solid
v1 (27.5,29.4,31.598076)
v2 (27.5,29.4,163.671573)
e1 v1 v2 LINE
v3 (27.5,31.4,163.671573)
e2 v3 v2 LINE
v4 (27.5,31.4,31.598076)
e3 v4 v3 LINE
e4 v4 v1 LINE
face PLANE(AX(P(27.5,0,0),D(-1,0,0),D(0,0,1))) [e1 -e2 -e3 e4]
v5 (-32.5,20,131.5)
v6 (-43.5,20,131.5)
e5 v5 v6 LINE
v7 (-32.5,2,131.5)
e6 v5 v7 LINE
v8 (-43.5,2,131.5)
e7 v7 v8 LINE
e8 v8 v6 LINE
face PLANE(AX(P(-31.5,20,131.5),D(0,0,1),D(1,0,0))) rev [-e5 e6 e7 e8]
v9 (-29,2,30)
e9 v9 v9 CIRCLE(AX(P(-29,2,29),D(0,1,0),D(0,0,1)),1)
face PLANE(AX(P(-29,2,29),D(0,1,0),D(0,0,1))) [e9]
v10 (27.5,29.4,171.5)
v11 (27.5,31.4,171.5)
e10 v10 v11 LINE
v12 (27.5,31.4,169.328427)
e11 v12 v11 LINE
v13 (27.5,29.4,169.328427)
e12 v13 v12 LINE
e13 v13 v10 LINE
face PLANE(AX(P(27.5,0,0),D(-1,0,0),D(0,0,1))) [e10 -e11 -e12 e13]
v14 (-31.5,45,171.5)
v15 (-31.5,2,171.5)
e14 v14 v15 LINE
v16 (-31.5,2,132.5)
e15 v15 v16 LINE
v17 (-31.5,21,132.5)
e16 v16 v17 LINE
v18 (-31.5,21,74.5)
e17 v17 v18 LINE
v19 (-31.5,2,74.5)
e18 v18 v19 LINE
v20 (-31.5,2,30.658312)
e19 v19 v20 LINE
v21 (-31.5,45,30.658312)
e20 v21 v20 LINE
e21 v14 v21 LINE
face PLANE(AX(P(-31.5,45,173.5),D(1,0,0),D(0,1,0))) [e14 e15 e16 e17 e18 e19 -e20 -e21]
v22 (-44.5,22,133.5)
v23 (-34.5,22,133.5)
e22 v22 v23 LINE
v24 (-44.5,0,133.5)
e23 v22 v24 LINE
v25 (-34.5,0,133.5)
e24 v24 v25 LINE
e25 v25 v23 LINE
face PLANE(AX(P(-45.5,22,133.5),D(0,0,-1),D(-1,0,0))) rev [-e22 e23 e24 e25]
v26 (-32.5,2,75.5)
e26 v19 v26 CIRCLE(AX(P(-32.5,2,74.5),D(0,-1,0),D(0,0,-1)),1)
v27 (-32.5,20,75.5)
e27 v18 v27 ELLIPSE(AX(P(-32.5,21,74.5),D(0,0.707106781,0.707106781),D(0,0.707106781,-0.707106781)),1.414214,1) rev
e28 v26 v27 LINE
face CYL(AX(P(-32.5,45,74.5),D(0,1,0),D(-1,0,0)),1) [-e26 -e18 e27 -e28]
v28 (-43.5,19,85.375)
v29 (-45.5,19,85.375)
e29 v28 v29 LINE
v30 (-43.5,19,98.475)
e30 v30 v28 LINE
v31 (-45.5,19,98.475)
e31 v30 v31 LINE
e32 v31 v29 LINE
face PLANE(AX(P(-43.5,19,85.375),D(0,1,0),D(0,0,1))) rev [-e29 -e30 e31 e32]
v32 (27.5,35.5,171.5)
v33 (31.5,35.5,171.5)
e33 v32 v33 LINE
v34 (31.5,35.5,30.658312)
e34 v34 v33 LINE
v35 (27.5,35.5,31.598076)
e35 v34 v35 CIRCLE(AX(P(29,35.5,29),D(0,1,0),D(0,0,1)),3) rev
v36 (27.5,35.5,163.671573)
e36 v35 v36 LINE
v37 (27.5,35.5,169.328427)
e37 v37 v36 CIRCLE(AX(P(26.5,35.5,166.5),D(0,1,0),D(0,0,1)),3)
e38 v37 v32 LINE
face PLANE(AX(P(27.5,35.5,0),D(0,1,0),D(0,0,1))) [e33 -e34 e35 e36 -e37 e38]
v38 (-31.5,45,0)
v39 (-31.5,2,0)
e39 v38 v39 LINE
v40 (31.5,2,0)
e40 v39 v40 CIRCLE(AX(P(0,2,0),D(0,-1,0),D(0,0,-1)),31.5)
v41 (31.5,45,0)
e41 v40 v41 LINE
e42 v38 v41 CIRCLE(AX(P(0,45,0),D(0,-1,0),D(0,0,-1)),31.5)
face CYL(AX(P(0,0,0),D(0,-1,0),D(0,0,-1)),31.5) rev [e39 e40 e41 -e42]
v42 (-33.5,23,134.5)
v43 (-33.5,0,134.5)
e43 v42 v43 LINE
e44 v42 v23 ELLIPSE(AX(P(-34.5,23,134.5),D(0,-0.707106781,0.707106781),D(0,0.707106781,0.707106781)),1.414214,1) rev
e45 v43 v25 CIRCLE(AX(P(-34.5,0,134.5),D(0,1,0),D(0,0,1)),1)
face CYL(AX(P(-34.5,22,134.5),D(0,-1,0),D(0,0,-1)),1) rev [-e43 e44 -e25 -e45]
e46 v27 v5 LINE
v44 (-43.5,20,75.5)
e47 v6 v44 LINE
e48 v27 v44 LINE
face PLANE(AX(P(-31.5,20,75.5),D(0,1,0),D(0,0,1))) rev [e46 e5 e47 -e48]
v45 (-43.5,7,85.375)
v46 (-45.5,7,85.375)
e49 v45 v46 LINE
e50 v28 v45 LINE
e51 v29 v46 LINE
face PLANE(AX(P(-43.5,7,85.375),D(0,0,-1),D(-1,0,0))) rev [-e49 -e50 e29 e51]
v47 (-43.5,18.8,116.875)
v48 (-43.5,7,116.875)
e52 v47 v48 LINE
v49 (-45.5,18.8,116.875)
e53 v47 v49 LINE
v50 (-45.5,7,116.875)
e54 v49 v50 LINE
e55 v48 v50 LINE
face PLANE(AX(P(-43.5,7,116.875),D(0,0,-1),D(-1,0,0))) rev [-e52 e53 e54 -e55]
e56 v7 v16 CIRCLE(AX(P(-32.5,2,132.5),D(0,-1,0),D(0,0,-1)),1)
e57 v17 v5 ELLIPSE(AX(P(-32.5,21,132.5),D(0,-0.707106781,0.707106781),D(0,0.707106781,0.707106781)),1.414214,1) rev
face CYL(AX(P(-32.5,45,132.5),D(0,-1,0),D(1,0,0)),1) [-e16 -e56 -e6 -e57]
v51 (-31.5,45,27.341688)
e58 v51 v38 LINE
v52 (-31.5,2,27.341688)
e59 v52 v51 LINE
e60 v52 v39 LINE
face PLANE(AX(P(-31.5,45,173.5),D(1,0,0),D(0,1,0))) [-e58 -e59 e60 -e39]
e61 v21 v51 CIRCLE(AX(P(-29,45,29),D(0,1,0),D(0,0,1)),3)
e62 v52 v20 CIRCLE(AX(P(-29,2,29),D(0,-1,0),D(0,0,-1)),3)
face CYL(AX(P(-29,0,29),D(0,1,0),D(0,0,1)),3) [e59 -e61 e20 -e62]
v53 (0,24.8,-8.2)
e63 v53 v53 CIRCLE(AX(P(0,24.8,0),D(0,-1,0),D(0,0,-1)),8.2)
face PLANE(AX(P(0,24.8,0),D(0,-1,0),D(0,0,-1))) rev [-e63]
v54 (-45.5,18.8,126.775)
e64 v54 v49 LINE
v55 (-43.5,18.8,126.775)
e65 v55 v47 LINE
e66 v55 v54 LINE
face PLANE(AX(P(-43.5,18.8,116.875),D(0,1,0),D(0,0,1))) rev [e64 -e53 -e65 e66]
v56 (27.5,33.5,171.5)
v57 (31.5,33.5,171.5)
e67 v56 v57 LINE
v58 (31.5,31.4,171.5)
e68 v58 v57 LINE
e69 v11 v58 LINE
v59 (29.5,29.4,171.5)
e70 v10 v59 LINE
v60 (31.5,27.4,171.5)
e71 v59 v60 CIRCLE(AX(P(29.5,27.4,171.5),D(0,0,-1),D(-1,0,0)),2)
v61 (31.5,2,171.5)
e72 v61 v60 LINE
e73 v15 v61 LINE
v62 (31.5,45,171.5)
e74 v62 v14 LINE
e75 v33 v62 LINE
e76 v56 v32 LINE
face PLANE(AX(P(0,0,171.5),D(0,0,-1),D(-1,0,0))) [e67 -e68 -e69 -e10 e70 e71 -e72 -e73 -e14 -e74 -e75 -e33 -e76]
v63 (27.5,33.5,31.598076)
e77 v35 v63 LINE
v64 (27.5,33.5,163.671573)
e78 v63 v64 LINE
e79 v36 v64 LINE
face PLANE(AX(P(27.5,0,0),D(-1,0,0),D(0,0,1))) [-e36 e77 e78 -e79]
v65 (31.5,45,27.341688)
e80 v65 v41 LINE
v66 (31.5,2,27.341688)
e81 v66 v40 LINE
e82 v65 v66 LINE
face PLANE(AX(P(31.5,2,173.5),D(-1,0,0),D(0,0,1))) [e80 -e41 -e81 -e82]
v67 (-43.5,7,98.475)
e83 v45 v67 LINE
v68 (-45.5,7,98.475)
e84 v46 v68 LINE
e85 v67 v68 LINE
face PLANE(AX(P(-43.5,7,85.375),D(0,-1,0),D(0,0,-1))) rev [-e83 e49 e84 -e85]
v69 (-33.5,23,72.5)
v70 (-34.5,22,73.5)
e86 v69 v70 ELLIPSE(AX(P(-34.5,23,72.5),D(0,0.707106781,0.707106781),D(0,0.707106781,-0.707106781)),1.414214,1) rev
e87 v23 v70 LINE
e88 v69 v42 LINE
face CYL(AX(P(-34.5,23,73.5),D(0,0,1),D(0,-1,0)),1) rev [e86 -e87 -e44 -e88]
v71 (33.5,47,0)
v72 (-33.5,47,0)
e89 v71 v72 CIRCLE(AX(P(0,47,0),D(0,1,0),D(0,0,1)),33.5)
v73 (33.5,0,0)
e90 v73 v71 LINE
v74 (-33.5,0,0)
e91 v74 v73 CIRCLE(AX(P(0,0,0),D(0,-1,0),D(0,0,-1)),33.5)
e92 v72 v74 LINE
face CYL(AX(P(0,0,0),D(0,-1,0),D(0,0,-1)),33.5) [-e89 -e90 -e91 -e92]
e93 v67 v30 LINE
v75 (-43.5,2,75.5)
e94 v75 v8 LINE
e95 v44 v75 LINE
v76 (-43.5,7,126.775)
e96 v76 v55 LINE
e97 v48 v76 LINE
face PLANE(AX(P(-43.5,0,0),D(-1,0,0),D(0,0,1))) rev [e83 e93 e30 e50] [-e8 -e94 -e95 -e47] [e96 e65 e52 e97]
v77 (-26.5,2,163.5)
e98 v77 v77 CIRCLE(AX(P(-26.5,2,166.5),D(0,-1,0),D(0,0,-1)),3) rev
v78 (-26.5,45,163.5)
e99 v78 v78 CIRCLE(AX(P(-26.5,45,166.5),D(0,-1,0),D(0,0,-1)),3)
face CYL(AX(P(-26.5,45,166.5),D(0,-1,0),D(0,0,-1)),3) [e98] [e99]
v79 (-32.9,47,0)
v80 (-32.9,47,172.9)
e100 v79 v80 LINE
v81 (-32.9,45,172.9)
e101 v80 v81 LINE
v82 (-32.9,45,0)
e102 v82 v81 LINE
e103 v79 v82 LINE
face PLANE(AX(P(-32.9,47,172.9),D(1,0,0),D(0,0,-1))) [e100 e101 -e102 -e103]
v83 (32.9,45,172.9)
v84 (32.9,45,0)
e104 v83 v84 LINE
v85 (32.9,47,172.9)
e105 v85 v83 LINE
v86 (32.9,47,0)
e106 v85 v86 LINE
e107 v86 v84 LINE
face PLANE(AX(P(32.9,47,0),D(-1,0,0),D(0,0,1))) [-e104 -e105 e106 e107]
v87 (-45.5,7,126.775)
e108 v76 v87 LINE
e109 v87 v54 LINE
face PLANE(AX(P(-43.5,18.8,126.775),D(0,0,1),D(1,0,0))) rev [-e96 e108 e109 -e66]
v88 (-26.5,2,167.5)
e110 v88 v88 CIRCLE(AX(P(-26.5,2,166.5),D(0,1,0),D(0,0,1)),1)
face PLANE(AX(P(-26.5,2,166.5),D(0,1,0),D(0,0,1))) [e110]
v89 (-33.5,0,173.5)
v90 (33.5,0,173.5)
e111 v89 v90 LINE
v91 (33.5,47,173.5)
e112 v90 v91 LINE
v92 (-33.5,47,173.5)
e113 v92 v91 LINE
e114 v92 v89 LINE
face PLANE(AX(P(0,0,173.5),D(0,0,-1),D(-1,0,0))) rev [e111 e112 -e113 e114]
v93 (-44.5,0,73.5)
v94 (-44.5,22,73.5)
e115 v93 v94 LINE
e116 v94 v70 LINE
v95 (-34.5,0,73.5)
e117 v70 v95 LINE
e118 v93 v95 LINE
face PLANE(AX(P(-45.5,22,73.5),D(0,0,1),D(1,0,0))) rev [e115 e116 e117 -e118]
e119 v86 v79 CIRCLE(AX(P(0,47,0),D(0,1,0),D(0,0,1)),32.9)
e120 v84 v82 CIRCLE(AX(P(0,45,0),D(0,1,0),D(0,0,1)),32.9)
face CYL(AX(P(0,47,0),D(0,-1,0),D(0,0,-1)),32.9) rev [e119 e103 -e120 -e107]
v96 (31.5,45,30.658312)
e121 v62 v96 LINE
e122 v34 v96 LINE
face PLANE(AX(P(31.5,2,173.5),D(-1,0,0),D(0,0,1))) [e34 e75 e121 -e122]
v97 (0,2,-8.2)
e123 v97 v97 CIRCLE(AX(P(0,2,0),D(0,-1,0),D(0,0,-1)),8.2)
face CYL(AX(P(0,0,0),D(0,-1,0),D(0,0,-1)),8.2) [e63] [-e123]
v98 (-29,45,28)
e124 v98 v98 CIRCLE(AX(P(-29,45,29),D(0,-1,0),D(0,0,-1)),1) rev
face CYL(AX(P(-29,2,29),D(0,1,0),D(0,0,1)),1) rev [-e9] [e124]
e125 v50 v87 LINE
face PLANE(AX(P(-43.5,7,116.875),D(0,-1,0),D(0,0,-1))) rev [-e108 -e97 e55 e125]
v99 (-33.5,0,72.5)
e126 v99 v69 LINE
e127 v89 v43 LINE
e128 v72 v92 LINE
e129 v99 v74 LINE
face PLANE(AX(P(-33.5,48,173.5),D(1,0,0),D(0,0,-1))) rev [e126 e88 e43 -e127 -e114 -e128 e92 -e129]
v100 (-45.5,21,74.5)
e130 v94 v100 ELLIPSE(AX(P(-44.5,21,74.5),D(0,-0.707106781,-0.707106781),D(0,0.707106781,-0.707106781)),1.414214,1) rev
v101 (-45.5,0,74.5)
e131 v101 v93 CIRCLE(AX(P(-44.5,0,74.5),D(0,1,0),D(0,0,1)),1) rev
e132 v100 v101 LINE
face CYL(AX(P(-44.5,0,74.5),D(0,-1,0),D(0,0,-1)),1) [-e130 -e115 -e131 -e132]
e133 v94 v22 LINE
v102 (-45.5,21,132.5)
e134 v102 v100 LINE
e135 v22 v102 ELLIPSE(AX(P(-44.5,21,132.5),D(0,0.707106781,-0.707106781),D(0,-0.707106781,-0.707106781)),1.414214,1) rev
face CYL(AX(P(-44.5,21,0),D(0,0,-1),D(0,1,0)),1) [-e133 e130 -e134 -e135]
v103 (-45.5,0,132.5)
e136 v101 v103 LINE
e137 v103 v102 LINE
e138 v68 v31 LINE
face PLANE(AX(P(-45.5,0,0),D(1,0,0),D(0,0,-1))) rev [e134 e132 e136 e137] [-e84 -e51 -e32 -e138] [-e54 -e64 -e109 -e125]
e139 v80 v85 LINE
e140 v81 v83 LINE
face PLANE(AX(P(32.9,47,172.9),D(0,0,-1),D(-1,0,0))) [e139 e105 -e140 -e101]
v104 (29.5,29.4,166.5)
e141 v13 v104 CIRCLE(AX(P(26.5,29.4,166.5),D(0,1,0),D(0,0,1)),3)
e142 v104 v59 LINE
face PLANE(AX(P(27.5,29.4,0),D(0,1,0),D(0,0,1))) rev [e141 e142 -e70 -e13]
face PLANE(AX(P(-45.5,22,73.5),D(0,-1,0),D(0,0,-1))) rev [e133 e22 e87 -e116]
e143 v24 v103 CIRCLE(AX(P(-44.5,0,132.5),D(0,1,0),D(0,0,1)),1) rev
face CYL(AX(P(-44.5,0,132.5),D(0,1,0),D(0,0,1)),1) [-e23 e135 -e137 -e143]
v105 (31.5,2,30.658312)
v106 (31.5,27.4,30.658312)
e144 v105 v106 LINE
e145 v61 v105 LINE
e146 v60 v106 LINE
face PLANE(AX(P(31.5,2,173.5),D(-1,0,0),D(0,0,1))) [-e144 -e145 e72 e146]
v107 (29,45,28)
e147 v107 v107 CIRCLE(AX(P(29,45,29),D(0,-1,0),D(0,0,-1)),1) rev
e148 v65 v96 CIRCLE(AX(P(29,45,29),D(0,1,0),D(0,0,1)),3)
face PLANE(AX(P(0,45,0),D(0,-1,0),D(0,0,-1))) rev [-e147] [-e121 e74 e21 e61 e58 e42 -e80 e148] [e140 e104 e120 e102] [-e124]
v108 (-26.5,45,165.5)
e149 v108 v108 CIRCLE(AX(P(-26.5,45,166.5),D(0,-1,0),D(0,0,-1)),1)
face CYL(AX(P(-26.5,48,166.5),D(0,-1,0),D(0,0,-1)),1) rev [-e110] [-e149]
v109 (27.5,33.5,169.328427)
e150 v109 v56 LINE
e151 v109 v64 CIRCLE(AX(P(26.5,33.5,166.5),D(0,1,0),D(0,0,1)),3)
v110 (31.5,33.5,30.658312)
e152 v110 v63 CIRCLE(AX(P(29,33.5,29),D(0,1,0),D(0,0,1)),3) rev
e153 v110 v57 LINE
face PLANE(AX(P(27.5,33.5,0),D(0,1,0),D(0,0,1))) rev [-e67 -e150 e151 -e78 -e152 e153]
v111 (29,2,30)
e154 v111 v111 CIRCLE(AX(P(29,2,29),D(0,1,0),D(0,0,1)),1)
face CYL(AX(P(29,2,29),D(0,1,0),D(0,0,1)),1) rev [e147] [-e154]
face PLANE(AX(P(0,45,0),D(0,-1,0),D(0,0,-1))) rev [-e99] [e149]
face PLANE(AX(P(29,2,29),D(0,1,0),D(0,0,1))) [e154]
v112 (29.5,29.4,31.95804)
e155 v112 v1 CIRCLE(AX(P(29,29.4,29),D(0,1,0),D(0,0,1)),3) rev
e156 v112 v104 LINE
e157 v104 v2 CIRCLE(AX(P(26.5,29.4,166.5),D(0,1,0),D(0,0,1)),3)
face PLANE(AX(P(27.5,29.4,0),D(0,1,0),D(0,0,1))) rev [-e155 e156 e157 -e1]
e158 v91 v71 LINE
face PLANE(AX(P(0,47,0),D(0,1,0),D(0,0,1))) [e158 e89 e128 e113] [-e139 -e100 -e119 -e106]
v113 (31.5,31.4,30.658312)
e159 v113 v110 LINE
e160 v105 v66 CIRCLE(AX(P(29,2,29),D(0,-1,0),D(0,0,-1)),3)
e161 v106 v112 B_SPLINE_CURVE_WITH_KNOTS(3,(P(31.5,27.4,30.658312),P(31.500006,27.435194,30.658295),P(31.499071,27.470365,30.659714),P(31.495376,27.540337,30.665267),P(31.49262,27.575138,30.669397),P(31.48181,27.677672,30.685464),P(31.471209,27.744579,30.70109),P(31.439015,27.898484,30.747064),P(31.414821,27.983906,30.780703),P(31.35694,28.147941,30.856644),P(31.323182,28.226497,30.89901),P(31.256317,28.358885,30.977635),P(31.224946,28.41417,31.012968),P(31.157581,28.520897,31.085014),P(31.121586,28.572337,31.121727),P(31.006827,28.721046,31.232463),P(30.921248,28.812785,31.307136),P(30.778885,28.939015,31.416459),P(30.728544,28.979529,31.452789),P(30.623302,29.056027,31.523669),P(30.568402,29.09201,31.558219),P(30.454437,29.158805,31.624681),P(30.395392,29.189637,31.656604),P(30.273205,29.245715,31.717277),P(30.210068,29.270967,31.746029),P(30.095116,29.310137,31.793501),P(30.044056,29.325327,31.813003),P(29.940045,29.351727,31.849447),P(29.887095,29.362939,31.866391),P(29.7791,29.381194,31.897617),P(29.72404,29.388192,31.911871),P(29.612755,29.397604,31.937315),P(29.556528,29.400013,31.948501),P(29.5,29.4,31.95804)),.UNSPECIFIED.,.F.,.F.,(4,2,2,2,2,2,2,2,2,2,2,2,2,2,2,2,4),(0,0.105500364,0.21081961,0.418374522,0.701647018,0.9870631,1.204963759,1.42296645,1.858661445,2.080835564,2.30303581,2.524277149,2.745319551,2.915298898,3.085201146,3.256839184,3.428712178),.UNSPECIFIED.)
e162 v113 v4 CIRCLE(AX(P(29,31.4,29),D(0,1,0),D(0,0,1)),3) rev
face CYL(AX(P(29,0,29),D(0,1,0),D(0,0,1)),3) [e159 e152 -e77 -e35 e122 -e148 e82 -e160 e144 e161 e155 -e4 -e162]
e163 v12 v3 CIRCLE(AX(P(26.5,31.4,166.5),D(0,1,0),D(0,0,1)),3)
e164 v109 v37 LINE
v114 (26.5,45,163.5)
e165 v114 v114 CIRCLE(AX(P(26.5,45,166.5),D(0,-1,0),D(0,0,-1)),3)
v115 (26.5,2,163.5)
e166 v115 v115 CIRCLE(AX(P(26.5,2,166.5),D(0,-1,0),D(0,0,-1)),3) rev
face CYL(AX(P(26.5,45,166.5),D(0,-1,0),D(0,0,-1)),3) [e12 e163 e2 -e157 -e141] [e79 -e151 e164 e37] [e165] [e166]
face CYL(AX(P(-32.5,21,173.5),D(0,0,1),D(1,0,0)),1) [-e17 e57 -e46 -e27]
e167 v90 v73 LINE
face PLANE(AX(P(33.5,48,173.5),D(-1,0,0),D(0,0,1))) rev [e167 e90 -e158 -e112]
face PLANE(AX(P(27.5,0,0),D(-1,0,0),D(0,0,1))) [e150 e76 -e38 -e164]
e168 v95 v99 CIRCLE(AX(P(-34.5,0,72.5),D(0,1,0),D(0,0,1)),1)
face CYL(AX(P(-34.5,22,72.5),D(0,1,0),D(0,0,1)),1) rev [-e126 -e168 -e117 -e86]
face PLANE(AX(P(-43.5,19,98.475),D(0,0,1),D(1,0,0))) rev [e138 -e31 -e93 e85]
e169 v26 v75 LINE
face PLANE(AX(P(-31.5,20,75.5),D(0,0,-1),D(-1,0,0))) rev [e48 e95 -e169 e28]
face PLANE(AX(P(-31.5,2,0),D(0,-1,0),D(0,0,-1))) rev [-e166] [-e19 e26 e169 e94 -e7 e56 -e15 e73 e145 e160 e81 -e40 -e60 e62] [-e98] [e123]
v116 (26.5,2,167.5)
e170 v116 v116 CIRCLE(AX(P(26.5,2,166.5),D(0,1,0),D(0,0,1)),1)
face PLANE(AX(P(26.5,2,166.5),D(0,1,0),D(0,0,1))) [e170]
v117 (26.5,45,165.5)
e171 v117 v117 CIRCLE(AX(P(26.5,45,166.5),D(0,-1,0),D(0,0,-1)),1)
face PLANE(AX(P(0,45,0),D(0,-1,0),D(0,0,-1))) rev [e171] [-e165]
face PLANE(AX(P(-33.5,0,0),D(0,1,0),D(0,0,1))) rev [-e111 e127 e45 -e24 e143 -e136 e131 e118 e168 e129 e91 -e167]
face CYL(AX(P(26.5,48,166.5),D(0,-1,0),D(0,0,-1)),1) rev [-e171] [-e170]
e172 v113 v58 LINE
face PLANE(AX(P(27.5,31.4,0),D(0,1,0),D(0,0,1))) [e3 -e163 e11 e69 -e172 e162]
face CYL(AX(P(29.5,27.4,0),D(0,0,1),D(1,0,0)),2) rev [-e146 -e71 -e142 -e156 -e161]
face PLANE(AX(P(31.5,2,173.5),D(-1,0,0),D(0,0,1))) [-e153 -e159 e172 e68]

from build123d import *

# Parameters (mm, degrees)
SKETCH4_W                = 63
SKETCH4_H                = 43
BOSS_EXTRUDE2_DEPTH      = 173.5
SKETCH6_R                = 4
CUT_EXTRUDE1_DEPTH       = 3
SKETCH9_W                = 63
SKETCH9_H                = 43
CUT_EXTRUDE2_DEPTH       = 173.5
SKETCH10_R               = 8.2
BOSS_EXTRUDE3_DEPTH      = 22.8
SKETCH11_W               = 63
SKETCH11_H               = 43
BOSS_EXTRUDE4_DEPTH      = 2
SKETCH13_R               = 3
BOSS_EXTRUDE5_DEPTH      = 43
SKETCH14_R               = 1
CUT_EXTRUDE3_DEPTH       = 46
SKETCH15_R               = 4.3
CUT_EXTRUDE4_DEPTH       = 2
FILLET1_R                = 1
SKETCH19_R               = 6
CUT_EXTRUDE5_DEPTH       = 3
BOSS_EXTRUDE6_DEPTH      = 94
SKETCH21_W               = 37.035898385
SKETCH21_H               = 94
CUT_EXTRUDE6_DEPTH       = 13
FILLET2_R                = 1
BOSS_EXTRUDE8_DEPTH      = 2
SKETCH23_W               = 72.5
SKETCH23_H               = 25.3
CUT_EXTRUDE7_DEPTH       = 2
BOSS_EXTRUDE9_START      = -2
BOSS_EXTRUDE9_DEPTH      = 2
SKETCH25_R               = 3
BOSS_EXTRUDE10_DEPTH     = 48
SKETCH26_R               = 1
CUT_EXTRUDE8_DEPTH       = 46
SKETCH27_R               = 4.3
CUT_EXTRUDE9_DEPTH       = 2
FILLET3_R                = 1
SKETCH30_W               = 56
SKETCH30_H               = 18
CUT_EXTRUDE10_DEPTH      = 2
SKETCH31_W               = 60
SKETCH31_H               = 22
SKETCH31_W_2             = 56
SKETCH31_H_2             = 18
BOSS_EXTRUDE11_DEPTH     = 12
FILLET4_R                = 1
SKETCH33_W               = 56
SKETCH33_H               = 18
BOSS_EXTRUDE12_DEPTH     = 2
SKETCH34_W               = 1.256410256
SKETCH34_H               = 14
CUT_EXTRUDE11_DEPTH      = 1
SKETCH35_W               = 13.1
SKETCH35_H               = 12
SKETCH35_W_2             = 9.9
SKETCH35_H_2             = 11.8
CUT_EXTRUDE12_DEPTH      = 2
FILLET5_R                = 1
CUT_EXTRUDE13_DEPTH      = 186.67848556
CUT_EXTRUDE13_DEPTH_BACK = 3
FILLET6_R                = 1
SKETCH37_W               = 140.841687605
SKETCH37_H               = 2
BOSS_EXTRUDE13_DEPTH     = 4
FILLET8_R                = 2
SKETCH38_W               = 101.517619225
SKETCH38_H               = 238.576301881
CUT_EXTRUDE14_DEPTH      = 100
BOSS_EXTRUDE14_DEPTH     = 2


with BuildPart() as part:
    # Sketch1 → Revolve1 (revolve)
    with BuildSketch(Plane.XY, mode=Mode.PRIVATE) as revolve1_sk:
        Polygon((-31.5, 48), (-31.5, 50), (-33.5, 50), (-33.5, 0), (0, 0), (0, 24.8), (-8.2, 24.8), (-8.2, 2), (-31.5, 2), (-31.5, 45), (-4, 45), (-4, 48), align=None)
    revolve(revolve1_sk.sketch.rotate(Axis((0, 0, 0), (0, 1, 0)), 270), axis=Axis((0, 0, 0), (0, 1, 0)))

    # Sketch4 → Boss-Extrude2 (add)
    with BuildSketch(Plane.XY):
        Polygon((33.5, 0), (-33.5, 0), (-33.5, 48), (-31.5, 48), (31.5, 48), (33.5, 48), align=None)
        with Locations((0, 23.5)):
            Rectangle(SKETCH4_W, SKETCH4_H, mode=Mode.SUBTRACT)
    extrude(amount=BOSS_EXTRUDE2_DEPTH)

    # Sketch6 → Cut-Extrude1 (cut)
    with BuildSketch(Plane(origin=(0, 48, 0), x_dir=(1, 0, 0), z_dir=(0, 1, 0))):
        with Locations(Location((0, 0, 0), (0, 0, 90))):
            Circle(SKETCH6_R)
    extrude(amount=-CUT_EXTRUDE1_DEPTH, mode=Mode.SUBTRACT)

    # Sketch9 → Cut-Extrude2 (cut)
    with BuildSketch(Plane.XY.offset(173.5)):
        with Locations((0, 23.5)):
            Rectangle(SKETCH9_W, SKETCH9_H)
    extrude(amount=-CUT_EXTRUDE2_DEPTH, mode=Mode.SUBTRACT)

    # Sketch10 → Boss-Extrude3 (add)
    with BuildSketch(Plane(origin=(0, 2, 0), x_dir=(1, 0, 0), z_dir=(0, 1, 0))):
        with Locations(Location((0, 0, 0), (0, 0, 90))):
            Circle(SKETCH10_R)
    extrude(amount=BOSS_EXTRUDE3_DEPTH)

    # Sketch11 → Boss-Extrude4 (add)
    with BuildSketch(Plane.XY.offset(173.5)):
        with Locations((0, 23.5)):
            Rectangle(SKETCH11_W, SKETCH11_H)
    extrude(amount=-BOSS_EXTRUDE4_DEPTH)

    # Sketch13 → Boss-Extrude5 (add)
    with BuildSketch(Plane(origin=(0, 2, 0), x_dir=(1, 0, 0), z_dir=(0, 1, 0))):
        with Locations(Location((-26.5, -166.5, 0), (0, 0, 90))):
            Circle(SKETCH13_R)
        with Locations(Location((26.5, -166.5, 0), (0, 0, 90))):
            Circle(SKETCH13_R)
    extrude(amount=BOSS_EXTRUDE5_DEPTH)

    # Sketch14 → Cut-Extrude3 (cut)
    with BuildSketch(Plane(origin=(0, 2, 0), x_dir=(1, 0, 0), z_dir=(0, 1, 0))):
        with Locations(Location((-26.5, -166.5, 0), (0, 0, 270))):
            Circle(SKETCH14_R)
        with Locations(Location((26.5, -166.5, 0), (0, 0, 270))):
            Circle(SKETCH14_R)
    extrude(amount=CUT_EXTRUDE3_DEPTH, mode=Mode.SUBTRACT)

    # Sketch15 → Cut-Extrude4 (cut)
    with BuildSketch(Plane(origin=(0, 48, 0), x_dir=(1, 0, 0), z_dir=(0, 1, 0))):
        with Locations(Location((-26.5, -166.5, 0), (0, 0, 270))):
            Circle(SKETCH15_R)
        with Locations(Location((26.5, -166.5, 0), (0, 0, 270))):
            Circle(SKETCH15_R)
    extrude(amount=-CUT_EXTRUDE4_DEPTH, mode=Mode.SUBTRACT)

    # Fillet1
    fillet1_edges = [part.edges().sort_by_distance(p)[0] for p in [
        (-26.5, 46, 162.2),
        (26.5, 46, 162.2),
    ]]
    fillet(fillet1_edges, radius=FILLET1_R)

    # Sketch19 → Cut-Extrude5 (cut)
    with BuildSketch(Plane(origin=(0, 48, 0), x_dir=(1, 0, 0), z_dir=(0, 1, 0))):
        with Locations(Location((16.75, -51, 0), (0, 0, 270))):
            Circle(SKETCH19_R)
        with Locations(Location((16.75, -86, 0), (0, 0, 270))):
            Circle(SKETCH19_R)
        with Locations(Location((16.75, -121, 0), (0, 0, 270))):
            Circle(SKETCH19_R)
        with Locations(Location((16.75, -156, 0), (0, 0, 270))):
            Circle(SKETCH19_R)
    extrude(amount=-CUT_EXTRUDE5_DEPTH, mode=Mode.SUBTRACT)

    # Sketch20 → Boss-Extrude6 (add)
    with BuildSketch(Plane.XY.offset(56.5)):
        Polygon((9, 48), (-11.207259422, 83), (-33.5, 83), (-33.5, 48), align=None)
        Polygon((5.535898385, 50), (-12.36195996, 81), (-31.5, 81), (-31.5, 50), align=None, mode=Mode.SUBTRACT)
    extrude(amount=BOSS_EXTRUDE6_DEPTH)

    # Sketch21 → Cut-Extrude6 (cut)
    with BuildSketch(Plane(origin=(0, 50, 0), x_dir=(1, 0, 0), z_dir=(0, 1, 0))):
        with Locations((-12.982050808, -103.5)):
            Rectangle(SKETCH21_W, SKETCH21_H)
    extrude(amount=-CUT_EXTRUDE6_DEPTH, mode=Mode.SUBTRACT)

    # Fillet2
    fillet2_edges = [part.edges().sort_by_distance(p)[0] for p in [
        (-11.207259422, 83, 103.5),
        (-33.5, 83, 103.5),
    ]]
    fillet(fillet2_edges, radius=FILLET2_R)

    # Sketch22 → Boss-Extrude8 (add)
    with BuildSketch(Plane.XY.offset(150.5)):
        with BuildLine():
            Line((-33.5, 48), (-33.5, 45))
            Line((-33.5, 45), (9, 45))
            Line((9, 45), (9, 48))
            Line((9, 48), (-10.918584287, 82.5))
            ThreePointArc((-10.918584287, 82.5), (-11.284609691, 82.866025404), (-11.784609691, 83))
            Line((-11.784609691, 83), (-32.5, 83))
            ThreePointArc((-32.5, 83), (-33.207106781, 82.707106781), (-33.5, 82))
            Line((-33.5, 82), (-33.5, 48))
        make_face()
    extrude(amount=-BOSS_EXTRUDE8_DEPTH)

    # Sketch23 → Cut-Extrude7 (cut)
    with BuildSketch(Plane(origin=(27.534609691, 15.897114317, 0), x_dir=(0, 0, -1), z_dir=(0.8660254037844364, 0.5000000000000041, 0))):
        with Locations((-103.5, 54.719219382)):
            Rectangle(SKETCH23_W, SKETCH23_H)
    extrude(amount=-CUT_EXTRUDE7_DEPTH, mode=Mode.SUBTRACT)

    # Sketch24 → Boss-Extrude9 (add)
    with BuildSketch(Plane(origin=(0, 0, 56.5), x_dir=(-1, 0, 0), z_dir=(0, 0, -1)).offset(BOSS_EXTRUDE9_START)):
        with BuildLine():
            Line((-9, 48), (-9, 45))
            Line((-9, 45), (33.5, 45))
            Line((33.5, 45), (33.5, 82))
            ThreePointArc((33.5, 82), (33.207106781, 82.707106781), (32.5, 83))
            Line((32.5, 83), (11.784609691, 83))
            ThreePointArc((11.784609691, 83), (11.284609691, 82.866025404), (10.918584287, 82.5))
            Line((10.918584287, 82.5), (-9, 48))
        make_face()
    extrude(amount=BOSS_EXTRUDE9_DEPTH)

    # Sketch25 → Boss-Extrude10 (add)
    with BuildSketch(Plane(origin=(0, 48, 0), x_dir=(1, 0, 0), z_dir=(0, 1, 0))):
        with Locations((29, -29)):
            Circle(SKETCH25_R)
        with Locations((-29, -29)):
            Circle(SKETCH25_R)
    extrude(amount=-BOSS_EXTRUDE10_DEPTH)

    # Sketch26 → Cut-Extrude8 (cut)
    with BuildSketch(Plane(origin=(0, 48, 0), x_dir=(1, 0, 0), z_dir=(0, 1, 0))):
        with Locations(Location((29, -29, 0), (0, 0, 270))):
            Circle(SKETCH26_R)
        with Locations(Location((-29, -29, 0), (0, 0, 270))):
            Circle(SKETCH26_R)
    extrude(amount=-CUT_EXTRUDE8_DEPTH, mode=Mode.SUBTRACT)

    # Sketch27 → Cut-Extrude9 (cut)
    with BuildSketch(Plane(origin=(0, 48, 0), x_dir=(1, 0, 0), z_dir=(0, 1, 0))):
        with Locations(Location((-29, -29, 0), (0, 0, 270))):
            Circle(SKETCH27_R)
        with Locations(Location((29, -29, 0), (0, 0, 270))):
            Circle(SKETCH27_R)
    extrude(amount=-CUT_EXTRUDE9_DEPTH, mode=Mode.SUBTRACT)

    # Fillet3
    fillet3_edges = [part.edges().sort_by_distance(p)[0] for p in [
        (-29, 46, 24.7),
        (29, 46, 24.7),
    ]]
    fillet(fillet3_edges, radius=FILLET3_R)

    # Sketch30 → Cut-Extrude10 (cut)
    with BuildSketch(Plane.ZY.offset(33.5)):
        with Locations((103.5, 11)):
            Rectangle(SKETCH30_W, SKETCH30_H)
    extrude(amount=-CUT_EXTRUDE10_DEPTH, mode=Mode.SUBTRACT)

    # Sketch31 → Boss-Extrude11 (add)
    with BuildSketch(Plane.ZY.offset(33.5)):
        with Locations((103.5, 11)):
            Rectangle(SKETCH31_W, SKETCH31_H)
        with Locations((103.5, 11)):
            Rectangle(SKETCH31_W_2, SKETCH31_H_2, mode=Mode.SUBTRACT)
    extrude(amount=BOSS_EXTRUDE11_DEPTH)

    # Fillet4
    fillet4_edges = [part.edges().sort_by_distance(p)[0] for p in [
        (-33.5, 22, 103.5),
        (-33.5, 11, 73.5),
        (-33.5, 11, 133.5),
    ]]
    fillet(fillet4_edges, radius=FILLET4_R)

    # Sketch33 → Boss-Extrude12 (add)
    with BuildSketch(Plane.ZY.offset(45.5)):
        with Locations((103.5, 11)):
            Rectangle(SKETCH33_W, SKETCH33_H)
    extrude(amount=-BOSS_EXTRUDE12_DEPTH)

    # Sketch34 → Cut-Extrude11 (cut)
    # profile 1 of 6: a face of its own
    with BuildSketch(Plane(origin=(-88.690997647, 83, 0), x_dir=(0, 0, -1), z_dir=(0, -1, 0))):
        with Locations((-131.948717949, 66.906387956)):
            Rectangle(SKETCH34_W, SKETCH34_H)
    # profile 2 of 6: a face of its own
    with BuildSketch(Plane(origin=(-88.690997647, 83, 0), x_dir=(0, 0, -1), z_dir=(0, -1, 0))):
        with BuildLine():
            add(Edge.make_bspline(
                [(-127.282051282, 71.752541802), (-127.204036474, 71.757021384), (-127.05199672, 71.765751451), (-126.831838559, 71.829913099), (-126.630653738, 71.938172272), (-126.452556555, 72.086921483), (-126.304534975, 72.264507803), (-126.195030127, 72.46518156), (-126.127927486, 72.68597799), (-126.119633012, 72.84021095), (-126.115384615, 72.919208469)],
                knots=[0, 0, 0, 0, 1.020591893, 1.988988293, 2.974634352, 3.991697318, 5.008760285, 5.983632262, 6.967224335, 8, 8, 8, 8], degree=3))
            add(Edge.make_bspline(
                [(-126.115384615, 72.919208469), (-126.119787901, 72.996319721), (-126.128486105, 73.148644483), (-126.195061577, 73.367578068), (-126.30439614, 73.56847965), (-126.453493838, 73.745645733), (-126.6295776, 73.897974931), (-126.832476342, 74.004732003), (-127.051429094, 74.073595456), (-127.203934167, 74.081715722), (-127.282051282, 74.085875135)],
                knots=[0, 0, 0, 0, 1.010056097, 1.99525427, 2.971718109, 3.990441831, 5.01702829, 6.004283803, 6.977741589, 8, 8, 8, 8], degree=3))
            add(Edge.make_bspline(
                [(-127.282051282, 74.085875135), (-127.360112179, 74.081559045), (-127.513404007, 74.073083337), (-127.73317612, 74.006101082), (-127.934845679, 73.896933206), (-128.11097521, 73.745920643), (-128.258874388, 73.567557044), (-128.373284839, 73.368945884), (-128.434548495, 73.148011315), (-128.443950276, 72.996195002), (-128.448717949, 72.919208469)],
                knots=[0, 0, 0, 0, 1.021821805, 2.006599202, 2.982645994, 4.008793999, 5.027082625, 6.009034913, 6.990375297, 8, 8, 8, 8], degree=3))
            add(Edge.make_bspline(
                [(-128.448717949, 72.919208469), (-128.444092294, 72.840340078), (-128.435076647, 72.686621378), (-128.373312706, 72.463815008), (-128.258735298, 72.265431373), (-128.111909392, 72.086648721), (-127.933780412, 71.939197607), (-127.733801774, 71.828562965), (-127.51284526, 71.76625627), (-127.360012131, 71.757174469), (-127.282051282, 71.752541802)],
                knots=[0, 0, 0, 0, 1.032329927, 2.012066096, 2.992413168, 4.009037178, 5.025661188, 6.000112418, 6.979848586, 8, 8, 8, 8], degree=3))
        make_face()
    # profile 3 of 6: a face of its own
    with BuildSketch(Plane(origin=(-88.690997647, 83, 0), x_dir=(0, 0, -1), z_dir=(0, -1, 0))):
        Polygon((-122.884615385, 59.906387956), (-121.628205128, 59.906387956), (-121.628205128, 65.649977699), (-114.448717949, 65.649977699), (-114.448717949, 59.906387956), (-113.192307692, 59.906387956), (-113.192307692, 73.906387956), (-114.448717949, 73.906387956), (-114.448717949, 67.085875135), (-121.628205128, 67.085875135), (-121.628205128, 73.906387956), (-122.884615385, 73.906387956), align=None)
    # profile 4 of 6: a face of its own
    with BuildSketch(Plane(origin=(-88.690997647, 83, 0), x_dir=(0, 0, -1), z_dir=(0, -1, 0))):
        with BuildLine():
            Line((-99.551282051, 63.675618725), (-99.551282051, 73.906387956))
            Line((-99.551282051, 73.906387956), (-100.807692308, 73.906387956))
            Line((-100.807692308, 73.906387956), (-100.807692308, 72.136756545))
            add(Edge.make_bspline(
                [(-100.807692308, 72.136756545), (-100.949559408, 72.296694095), (-101.226826553, 72.609278391), (-101.685478933, 73.020163), (-102.175666693, 73.355630058), (-102.689038567, 73.627929327), (-103.229568228, 73.833193668), (-103.794081172, 73.977799853), (-104.382135708, 74.071868231), (-104.783157032, 74.081164279), (-104.986378205, 74.085875135)],
                knots=[0, 0, 0, 0, 1.074235403, 2.099501444, 3.086304576, 4.053325556, 5.01427503, 5.985443889, 6.979105517, 8, 8, 8, 8], degree=3))
            add(Edge.make_bspline(
                [(-104.986378205, 74.085875135), (-105.167050511, 74.08097046), (-105.523344299, 74.071298224), (-106.047453548, 73.996237304), (-106.551848614, 73.875758039), (-107.036850958, 73.707995401), (-107.499174292, 73.486612277), (-107.941423686, 73.21870812), (-108.36463127, 72.902801794), (-108.760748522, 72.540247251), (-109.125978444, 72.14687795), (-109.445517738, 71.726092193), (-109.716337693, 71.283669461), (-109.938903193, 70.8197341), (-110.111136046, 70.334625248), (-110.23096351, 69.828675698), (-110.305943543, 69.302727324), (-110.315610879, 68.944567704), (-110.320512821, 68.762958469)],
                knots=[0, 0, 0, 0, 1.034036272, 2.039165313, 3.024406509, 3.999331371, 4.971254918, 5.953351348, 6.95522652, 7.989525907, 9.023492927, 10.024309745, 11.009187477, 11.988246066, 12.964946762, 13.950187958, 14.960617622, 16, 16, 16, 16], degree=3))
            add(Edge.make_bspline(
                [(-110.320512821, 68.762958469), (-110.315502156, 68.585102896), (-110.305596342, 68.233492024), (-110.23176582, 67.716388188), (-110.107706917, 67.2182747), (-109.933274241, 66.740996758), (-109.710590389, 66.282632207), (-109.435112943, 65.846767298), (-109.115688796, 65.426734526), (-108.74655549, 65.036003596), (-108.34688294, 64.676390503), (-107.921307552, 64.359716463), (-107.475135823, 64.092499188), (-107.007473118, 63.875277522), (-106.5216309, 63.702659962), (-106.013918487, 63.582328903), (-105.48664475, 63.511593502), (-105.128686543, 63.501335053), (-104.947115385, 63.496131545)],
                knots=[0, 0, 0, 0, 1.02050356, 2.017480486, 2.990790918, 3.96161403, 4.928589988, 5.909588639, 6.91611943, 7.952353252, 8.989586576, 9.99823133, 10.991940466, 11.968822692, 12.952985106, 13.945868367, 14.958059758, 16, 16, 16, 16], degree=3))
            add(Edge.make_bspline(
                [(-104.947115385, 63.496131545), (-104.738311782, 63.501860959), (-104.328857772, 63.513096067), (-103.729112136, 63.607392592), (-103.161484658, 63.765224909), (-102.621058799, 63.980649759), (-102.115429291, 64.270750367), (-101.639735311, 64.629702222), (-101.199621142, 65.066207485), (-100.9405952, 65.398270363), (-100.807692308, 65.568647571)],
                knots=[0, 0, 0, 0, 1.038908319, 2.037250181, 3.012632028, 3.966567879, 4.9252131, 5.905168122, 6.925168603, 8, 8, 8, 8], degree=3))
            Line((-100.807692308, 65.568647571), (-100.807692308, 63.675618725))
            Line((-100.807692308, 63.675618725), (-99.551282051, 63.675618725))
        make_face()
        with BuildLine():
            add(Edge.make_bspline(
                [(-104.930288462, 64.752541802), (-105.113941971, 64.759081875), (-105.476444788, 64.771990938), (-106.008676356, 64.872605062), (-106.517721233, 65.040443519), (-107.002751616, 65.268659247), (-107.450376696, 65.560996553), (-107.857064896, 65.905684904), (-108.211791596, 66.306947393), (-108.511723002, 66.755564948), (-108.760721655, 67.233621452), (-108.932550065, 67.737000467), (-109.046679273, 68.252096677), (-109.058279678, 68.601563937), (-109.064102564, 68.776980904)],
                knots=[0, 0, 0, 0, 1.031179624, 2.035384561, 3.030098214, 4.035455833, 5.037557836, 6.024646278, 7.02156144, 8.035264006, 9.049836703, 10.039645228, 11.015989397, 12, 12, 12, 12], degree=3))
            add(Edge.make_bspline(
                [(-109.064102564, 68.776980904), (-109.05654374, 68.951306689), (-109.04145572, 69.299274959), (-108.936056281, 69.815160534), (-108.751049717, 70.315255398), (-108.507497803, 70.799474277), (-108.202845091, 71.251438033), (-107.848818519, 71.660109619), (-107.440066701, 72.010111329), (-106.988500009, 72.303274908), (-106.506714423, 72.539101452), (-105.999879604, 72.705430661), (-105.476829524, 72.810449466), (-105.120547678, 72.823105087), (-104.94150641, 72.829464879)],
                knots=[0, 0, 0, 0, 0.979235476, 1.954632679, 2.943119654, 3.967171814, 4.992637064, 5.997548408, 6.995574264, 8.005058949, 9.015076297, 9.999929117, 10.994910263, 12, 12, 12, 12], degree=3))
            add(Edge.make_bspline(
                [(-104.94150641, 72.829464879), (-104.759723293, 72.82284818), (-104.399094225, 72.809721692), (-103.865022351, 72.708413684), (-103.347692816, 72.538491195), (-102.851318684, 72.307106954), (-102.389689733, 72.020246776), (-101.97729874, 71.682924863), (-101.621032586, 71.296628225), (-101.327706123, 70.863665084), (-101.093342241, 70.394243496), (-100.927394835, 69.892855662), (-100.826604225, 69.362481009), (-100.814083445, 68.998983698), (-100.807692308, 68.813439238)],
                knots=[0, 0, 0, 0, 1.017730373, 2.019016736, 3.032373701, 4.060729657, 5.079187105, 6.068726676, 7.03591854, 8.011858086, 8.988317194, 9.965225429, 10.961364673, 12, 12, 12, 12], degree=3))
            add(Edge.make_bspline(
                [(-100.807692308, 68.813439238), (-100.811530994, 68.67208797), (-100.819086743, 68.393863944), (-100.876808154, 67.985353095), (-100.968631033, 67.594421044), (-101.098004164, 67.220639903), (-101.268012245, 66.866138453), (-101.472841465, 66.528137895), (-101.716693177, 66.209786658), (-101.992146351, 65.911487906), (-102.297054473, 65.64077053), (-102.621284743, 65.402162507), (-102.964021402, 65.200234462), (-103.325023868, 65.038639209), (-103.701511674, 64.906991608), (-104.097093385, 64.820040643), (-104.507782261, 64.760144848), (-104.787970212, 64.755102835), (-104.930288462, 64.752541802)],
                knots=[0, 0, 0, 0, 1.050062701, 2.066855696, 3.059271411, 4.030305351, 4.999747758, 5.975466543, 6.961907836, 7.974539719, 8.98812422, 9.98710676, 10.961662635, 11.93785114, 12.922015094, 13.919620009, 14.94329489, 16, 16, 16, 16], degree=3))
        make_face(mode=Mode.SUBTRACT)
    # profile 5 of 6: a face of its own
    with BuildSketch(Plane(origin=(-88.690997647, 83, 0), x_dir=(0, 0, -1), z_dir=(0, -1, 0))):
        with BuildLine():
            Line((-96.679487179, 63.675618725), (-95.423076923, 63.675618725))
            Line((-95.423076923, 63.675618725), (-95.423076923, 65.520971289))
            add(Edge.make_bspline(
                [(-95.423076923, 65.520971289), (-95.289157957, 65.353350137), (-95.029691705, 65.02858634), (-94.59314516, 64.60509757), (-94.137956996, 64.249722748), (-93.656734238, 63.969916172), (-93.154428772, 63.758297763), (-92.632465882, 63.605695951), (-92.088020434, 63.514140011), (-91.717760861, 63.502181358), (-91.530448718, 63.496131545)],
                knots=[0, 0, 0, 0, 1.127869841, 2.185233117, 3.191641716, 4.159226741, 5.10472073, 6.052603964, 7.014823782, 8, 8, 8, 8], degree=3))
            add(Edge.make_bspline(
                [(-91.530448718, 63.496131545), (-91.341035811, 63.502717968), (-90.970123229, 63.515615649), (-90.432020324, 63.629261075), (-89.925930257, 63.809105693), (-89.458620286, 64.061868442), (-89.037280928, 64.375689687), (-88.671907889, 64.743804343), (-88.364647734, 65.161777592), (-88.15956584, 65.553010358), (-88.02692105, 65.900525254), (-87.939752105, 66.197763901), (-87.869230571, 66.529058154), (-87.806040534, 66.893588904), (-87.763885841, 67.292820282), (-87.730470414, 67.725799431), (-87.706569282, 68.192451381), (-87.705618498, 68.515197399), (-87.705128205, 68.68162834)],
                knots=[0, 0, 0, 0, 1.235764162, 2.419900973, 3.574701258, 4.732869372, 5.875730734, 6.993815468, 8.107424371, 9.251605764, 9.866123335, 10.534503958, 11.272175692, 12.077112099, 12.949509943, 13.89253218, 14.913238789, 16, 16, 16, 16], degree=3))
            Line((-87.705128205, 68.68162834), (-87.705128205, 73.906387956))
            Line((-87.705128205, 73.906387956), (-88.961538462, 73.906387956))
            Line((-88.961538462, 73.906387956), (-88.961538462, 69.093887956))
            add(Edge.make_bspline(
                [(-88.961538462, 69.093887956), (-88.962308095, 68.954597976), (-88.963780274, 68.68815995), (-88.968484365, 68.306686454), (-88.979557576, 67.961664657), (-88.995757207, 67.652102998), (-89.018432601, 67.379134492), (-89.042707021, 67.141377431), (-89.07214832, 66.940937808), (-89.098401967, 66.820277635), (-89.110176282, 66.766163597)],
                knots=[0, 0, 0, 0, 1.430803381, 2.736883362, 3.918614142, 4.976458302, 5.92063272, 6.731858525, 7.431260095, 8, 8, 8, 8], degree=3))
            add(Edge.make_bspline(
                [(-89.110176282, 66.766163597), (-89.152467435, 66.60720474), (-89.233648341, 66.302071799), (-89.438328407, 65.888890398), (-89.69079908, 65.534265166), (-90.003604456, 65.245489432), (-90.368343351, 65.020684953), (-90.785622116, 64.864823406), (-91.251122123, 64.767308391), (-91.578541768, 64.757601307), (-91.749198718, 64.752541802)],
                knots=[0, 0, 0, 0, 1.084232, 2.08126119, 3.027460722, 3.945137793, 4.874029258, 5.839697328, 6.874011781, 8, 8, 8, 8], degree=3))
            add(Edge.make_bspline(
                [(-91.749198718, 64.752541802), (-91.850278792, 64.754417715), (-92.050313648, 64.758130098), (-92.346777346, 64.796345108), (-92.635253712, 64.856700904), (-92.914969902, 64.945850548), (-93.186491199, 65.05424406), (-93.450941222, 65.187247995), (-93.70462484, 65.348127535), (-93.951109207, 65.528956343), (-94.180206001, 65.730331925), (-94.396414837, 65.939748523), (-94.58638105, 66.165974926), (-94.758817282, 66.401012527), (-94.907487653, 66.649582736), (-95.037311441, 66.90902848), (-95.147451161, 67.179760147), (-95.202182341, 67.367659979), (-95.229567308, 67.461676417)],
                knots=[0, 0, 0, 0, 1.023939463, 2.026349741, 3.024227553, 4.007104963, 4.997624259, 5.984875705, 7.002218968, 8.038748769, 9.079772093, 10.091408226, 11.086177727, 12.069739863, 13.043026652, 14.017557731, 15.008077027, 16, 16, 16, 16], degree=3))
            add(Edge.make_bspline(
                [(-95.229567308, 67.461676417), (-95.245325902, 67.530697229), (-95.279631537, 67.680951927), (-95.316684257, 67.927529605), (-95.350314558, 68.212769505), (-95.378462393, 68.536338773), (-95.395684059, 68.899370273), (-95.414461646, 69.300313625), (-95.42129789, 69.740767578), (-95.422467306, 70.047414349), (-95.423076923, 70.207269366)],
                knots=[0, 0, 0, 0, 0.615963638, 1.340920617, 2.168419149, 3.115676021, 4.16674242, 5.331190069, 6.6087489, 8, 8, 8, 8], degree=3))
            Line((-95.423076923, 70.207269366), (-95.423076923, 73.906387956))
            Line((-95.423076923, 73.906387956), (-96.679487179, 73.906387956))
            Line((-96.679487179, 73.906387956), (-96.679487179, 63.675618725))
        make_face()
    # profile 6 of 6: a face of its own
    with BuildSketch(Plane(origin=(-88.690997647, 83, 0), x_dir=(0, 0, -1), z_dir=(0, -1, 0))):
        with BuildLine():
            Line((-74.423076923, 59.547413597), (-74.423076923, 73.906387956))
            Line((-74.423076923, 73.906387956), (-75.679487179, 73.906387956))
            Line((-75.679487179, 73.906387956), (-75.679487179, 72.136756545))
            add(Edge.make_bspline(
                [(-75.679487179, 72.136756545), (-75.82135428, 72.296694095), (-76.098621425, 72.609278391), (-76.557273805, 73.020163), (-77.047461565, 73.355630058), (-77.560833439, 73.627929327), (-78.101363099, 73.833193668), (-78.665876043, 73.977799853), (-79.25393058, 74.071868231), (-79.654951904, 74.081164279), (-79.858173077, 74.085875135)],
                knots=[0, 0, 0, 0, 1.074235403, 2.099501444, 3.086304576, 4.053325556, 5.01427503, 5.985443889, 6.979105517, 8, 8, 8, 8], degree=3))
            add(Edge.make_bspline(
                [(-79.858173077, 74.085875135), (-80.038845383, 74.08097046), (-80.395139171, 74.071298224), (-80.91924842, 73.996237304), (-81.423643486, 73.875758039), (-81.90864583, 73.707995401), (-82.370969164, 73.486612277), (-82.813218558, 73.21870812), (-83.236426142, 72.902801794), (-83.632543394, 72.540247251), (-83.997773316, 72.14687795), (-84.31731261, 71.726092193), (-84.588132565, 71.283669461), (-84.810698064, 70.8197341), (-84.982930918, 70.334625248), (-85.102758382, 69.828675698), (-85.177738414, 69.302727324), (-85.187405751, 68.944567704), (-85.192307692, 68.762958469)],
                knots=[0, 0, 0, 0, 1.034036272, 2.039165313, 3.024406509, 3.999331371, 4.971254918, 5.953351348, 6.95522652, 7.989525907, 9.023492927, 10.024309745, 11.009187477, 11.988246066, 12.964946762, 13.950187958, 14.960617622, 16, 16, 16, 16], degree=3))
            add(Edge.make_bspline(
                [(-85.192307692, 68.762958469), (-85.187297028, 68.585102896), (-85.177391214, 68.233492024), (-85.103560692, 67.716388188), (-84.979501789, 67.2182747), (-84.805069113, 66.740996758), (-84.582385261, 66.282632207), (-84.306907815, 65.846767298), (-83.987483668, 65.426734526), (-83.618350361, 65.036003596), (-83.218677812, 64.676390503), (-82.793102423, 64.359716463), (-82.346930695, 64.092499188), (-81.879267989, 63.875277522), (-81.393425772, 63.702659962), (-80.885713359, 63.582328903), (-80.358439621, 63.511593502), (-80.000481415, 63.501335053), (-79.818910256, 63.496131545)],
                knots=[0, 0, 0, 0, 1.02050356, 2.017480486, 2.990790918, 3.96161403, 4.928589988, 5.909588639, 6.91611943, 7.952353252, 8.989586576, 9.99823133, 10.991940466, 11.968822692, 12.952985106, 13.945868367, 14.958059758, 16, 16, 16, 16], degree=3))
            add(Edge.make_bspline(
                [(-79.818910256, 63.496131545), (-79.610011355, 63.502290764), (-79.199966026, 63.514380625), (-78.600202205, 63.618863482), (-78.030823851, 63.786104789), (-77.49185283, 64.023662608), (-76.98802002, 64.333257117), (-76.512590236, 64.705577492), (-76.072848113, 65.149983962), (-75.812606589, 65.484482914), (-75.679487179, 65.655586674)],
                knots=[0, 0, 0, 0, 1.03083325, 2.023411113, 2.996083796, 3.9549903, 4.922369457, 5.908572979, 6.930187902, 8, 8, 8, 8], degree=3))
            Line((-75.679487179, 65.655586674), (-75.679487179, 59.547413597))
            Line((-75.679487179, 59.547413597), (-74.423076923, 59.547413597))
        make_face()
        with BuildLine():
            add(Edge.make_bspline(
                [(-79.802083333, 64.752541802), (-79.985736843, 64.759081875), (-80.34823966, 64.771990938), (-80.880471228, 64.872605062), (-81.389516104, 65.040443519), (-81.874546487, 65.268659247), (-82.322171568, 65.560996553), (-82.728859768, 65.905684904), (-83.083586468, 66.306947393), (-83.383517874, 66.755564948), (-83.632516527, 67.233621452), (-83.804344936, 67.737000467), (-83.918474145, 68.252096677), (-83.93007455, 68.601563937), (-83.935897436, 68.776980904)],
                knots=[0, 0, 0, 0, 1.031179624, 2.035384561, 3.030098214, 4.035455833, 5.037557836, 6.024646278, 7.02156144, 8.035264006, 9.049836703, 10.039645228, 11.015989397, 12, 12, 12, 12], degree=3))
            add(Edge.make_bspline(
                [(-83.935897436, 68.776980904), (-83.928338612, 68.951306689), (-83.913250592, 69.299274959), (-83.807851153, 69.815160534), (-83.622844589, 70.315255398), (-83.379292675, 70.799474277), (-83.074639963, 71.251438033), (-82.72061339, 71.660109619), (-82.311861573, 72.010111329), (-81.860294881, 72.303274908), (-81.378509295, 72.539101452), (-80.871674476, 72.705430661), (-80.348624396, 72.810449466), (-79.99234255, 72.823105087), (-79.813301282, 72.829464879)],
                knots=[0, 0, 0, 0, 0.979235476, 1.954632679, 2.943119654, 3.967171814, 4.992637064, 5.997548408, 6.995574264, 8.005058949, 9.015076297, 9.999929117, 10.994910263, 12, 12, 12, 12], degree=3))
            add(Edge.make_bspline(
                [(-79.813301282, 72.829464879), (-79.631518165, 72.82284818), (-79.270889097, 72.809721692), (-78.736817223, 72.708413684), (-78.219487688, 72.538491195), (-77.723113556, 72.307106954), (-77.261484605, 72.020246776), (-76.849093611, 71.682924863), (-76.492827458, 71.296628225), (-76.199500994, 70.863665084), (-75.965137113, 70.394243496), (-75.799189707, 69.892855662), (-75.698399097, 69.362481009), (-75.685878317, 68.998983698), (-75.679487179, 68.813439238)],
                knots=[0, 0, 0, 0, 1.017730373, 2.019016736, 3.032373701, 4.060729657, 5.079187105, 6.068726676, 7.03591854, 8.011858086, 8.988317194, 9.965225429, 10.961364673, 12, 12, 12, 12], degree=3))
            add(Edge.make_bspline(
                [(-75.679487179, 68.813439238), (-75.683325866, 68.67208797), (-75.690881615, 68.393863944), (-75.748603026, 67.985353095), (-75.840425905, 67.594421044), (-75.969799036, 67.220639903), (-76.139807117, 66.866138453), (-76.344636337, 66.528137895), (-76.588488049, 66.209786658), (-76.863941223, 65.911487906), (-77.168849344, 65.64077053), (-77.493079615, 65.402162507), (-77.835816274, 65.200234462), (-78.19681874, 65.038639209), (-78.573306545, 64.906991608), (-78.968888256, 64.820040643), (-79.379577132, 64.760144848), (-79.659765083, 64.755102835), (-79.802083333, 64.752541802)],
                knots=[0, 0, 0, 0, 1.050062701, 2.066855696, 3.059271411, 4.030305351, 4.999747758, 5.975466543, 6.961907836, 7.974539719, 8.98812422, 9.98710676, 10.961662635, 11.93785114, 12.922015094, 13.919620009, 14.94329489, 16, 16, 16, 16], degree=3))
        make_face(mode=Mode.SUBTRACT)
    extrude(amount=CUT_EXTRUDE11_DEPTH, mode=Mode.SUBTRACT)

    # Sketch35 → Cut-Extrude12 (cut)
    with BuildSketch(Plane.ZY.offset(45.5)):
        with Locations((91.925, 13)):
            Rectangle(SKETCH35_W, SKETCH35_H)
        with Locations((121.825, 12.9)):
            Rectangle(SKETCH35_W_2, SKETCH35_H_2)
    extrude(amount=-CUT_EXTRUDE12_DEPTH, mode=Mode.SUBTRACT)

    # Fillet5
    fillet5_edges = [part.edges().sort_by_distance(p)[0] for p in [
        (-45.5, 22, 103.5),
        (-45.5, 11, 73.5),
        (-45.5, 11, 133.5),
    ]]
    fillet(fillet5_edges, radius=FILLET5_R)

    # Sketch36 → Cut-Extrude13 (cut, two sides: drawn at the far end of the back side and taken through both)
    with BuildSketch(Plane(origin=(0, 48, 0), x_dir=(1, 0, 0), z_dir=(0, 1, 0)).offset(-CUT_EXTRUDE13_DEPTH_BACK)):
        with BuildLine():
            Line((0, -34.893159234), (0, -38.893159234))
            ThreePointArc((0, -38.893159234), (10.633828773, -37.522467598), (20.57248383, -33.5))
            Line((20.57248383, -33.5), (20.57248383, -28.208754037))
            ThreePointArc((20.57248383, -28.208754037), (10.815594803, -33.180137304), (0, -34.893159234))
        make_face()
        with BuildLine():
            ThreePointArc((0, -38.893159234), (-10.633828773, -37.522467598), (-20.57248383, -33.5))
            Line((-20.57248383, -33.5), (-20.57248383, -28.208754037))
            ThreePointArc((-20.57248383, -28.208754037), (-10.815594803, -33.180137304), (0, -34.893159234))
            Line((0, -34.893159234), (0, -38.893159234))
        make_face()
    extrude(amount=CUT_EXTRUDE13_DEPTH + CUT_EXTRUDE13_DEPTH_BACK, mode=Mode.SUBTRACT)

    # Fillet6
    fillet6_edges = [part.edges().sort_by_distance(p)[0] for p in [
        (-31.5, 20, 103.5),
        (-31.5, 11, 131.5),
        (-31.5, 11, 75.5),
    ]]
    fillet(fillet6_edges, radius=FILLET6_R)

    # Sketch37 → Boss-Extrude13 (add)
    with BuildSketch(Plane.ZY.offset(-31.5)):
        with Locations((101.079156197, 34.5)):
            Rectangle(SKETCH37_W, SKETCH37_H)
        with Locations((101.079156197, 30.4)):
            Rectangle(SKETCH37_W, SKETCH37_H)
    extrude(amount=BOSS_EXTRUDE13_DEPTH)

    # Fillet8
    fillet8_edges = [part.edges().sort_by_distance(p)[0] for p in [
        (31.5, 29.4, 101.079156198),
    ]]
    fillet(fillet8_edges, radius=FILLET8_R - 0.0001)  # a hair under: the kernel refuses the full size

    # Sketch38 → Cut-Extrude14 (cut)
    with BuildSketch(Plane(origin=(0, 45, 0), x_dir=(-1, 0, 0), z_dir=(0, -1, 0))):
        with Locations((3.929818551, -78.457251398)):
            Rectangle(SKETCH38_W, SKETCH38_H)
    extrude(amount=-CUT_EXTRUDE14_DEPTH, mode=Mode.SUBTRACT)

    # Sketch39 → Boss-Extrude14 (add)
    with BuildSketch(Plane(origin=(0, 45, 0), x_dir=(1, 0, 0), z_dir=(0, 1, 0))):
        with BuildLine():
            Line((33.5, 0), (33.5, -173.5))
            Line((33.5, -173.5), (-33.5, -173.5))
            Line((-33.5, -173.5), (-33.5, 0))
            ThreePointArc((-33.5, 0), (0, 33.5), (33.5, 0))
        make_face()
        with BuildLine():
            Line((-32.9, -172.9), (-32.9, 0))
            ThreePointArc((-32.9, 0), (0, 32.9), (32.9, 0))
            Line((32.9, 0), (32.9, -172.9))
            Line((32.9, -172.9), (-32.9, -172.9))
        make_face(mode=Mode.SUBTRACT)
    extrude(amount=BOSS_EXTRUDE14_DEPTH)


solid = part.part
